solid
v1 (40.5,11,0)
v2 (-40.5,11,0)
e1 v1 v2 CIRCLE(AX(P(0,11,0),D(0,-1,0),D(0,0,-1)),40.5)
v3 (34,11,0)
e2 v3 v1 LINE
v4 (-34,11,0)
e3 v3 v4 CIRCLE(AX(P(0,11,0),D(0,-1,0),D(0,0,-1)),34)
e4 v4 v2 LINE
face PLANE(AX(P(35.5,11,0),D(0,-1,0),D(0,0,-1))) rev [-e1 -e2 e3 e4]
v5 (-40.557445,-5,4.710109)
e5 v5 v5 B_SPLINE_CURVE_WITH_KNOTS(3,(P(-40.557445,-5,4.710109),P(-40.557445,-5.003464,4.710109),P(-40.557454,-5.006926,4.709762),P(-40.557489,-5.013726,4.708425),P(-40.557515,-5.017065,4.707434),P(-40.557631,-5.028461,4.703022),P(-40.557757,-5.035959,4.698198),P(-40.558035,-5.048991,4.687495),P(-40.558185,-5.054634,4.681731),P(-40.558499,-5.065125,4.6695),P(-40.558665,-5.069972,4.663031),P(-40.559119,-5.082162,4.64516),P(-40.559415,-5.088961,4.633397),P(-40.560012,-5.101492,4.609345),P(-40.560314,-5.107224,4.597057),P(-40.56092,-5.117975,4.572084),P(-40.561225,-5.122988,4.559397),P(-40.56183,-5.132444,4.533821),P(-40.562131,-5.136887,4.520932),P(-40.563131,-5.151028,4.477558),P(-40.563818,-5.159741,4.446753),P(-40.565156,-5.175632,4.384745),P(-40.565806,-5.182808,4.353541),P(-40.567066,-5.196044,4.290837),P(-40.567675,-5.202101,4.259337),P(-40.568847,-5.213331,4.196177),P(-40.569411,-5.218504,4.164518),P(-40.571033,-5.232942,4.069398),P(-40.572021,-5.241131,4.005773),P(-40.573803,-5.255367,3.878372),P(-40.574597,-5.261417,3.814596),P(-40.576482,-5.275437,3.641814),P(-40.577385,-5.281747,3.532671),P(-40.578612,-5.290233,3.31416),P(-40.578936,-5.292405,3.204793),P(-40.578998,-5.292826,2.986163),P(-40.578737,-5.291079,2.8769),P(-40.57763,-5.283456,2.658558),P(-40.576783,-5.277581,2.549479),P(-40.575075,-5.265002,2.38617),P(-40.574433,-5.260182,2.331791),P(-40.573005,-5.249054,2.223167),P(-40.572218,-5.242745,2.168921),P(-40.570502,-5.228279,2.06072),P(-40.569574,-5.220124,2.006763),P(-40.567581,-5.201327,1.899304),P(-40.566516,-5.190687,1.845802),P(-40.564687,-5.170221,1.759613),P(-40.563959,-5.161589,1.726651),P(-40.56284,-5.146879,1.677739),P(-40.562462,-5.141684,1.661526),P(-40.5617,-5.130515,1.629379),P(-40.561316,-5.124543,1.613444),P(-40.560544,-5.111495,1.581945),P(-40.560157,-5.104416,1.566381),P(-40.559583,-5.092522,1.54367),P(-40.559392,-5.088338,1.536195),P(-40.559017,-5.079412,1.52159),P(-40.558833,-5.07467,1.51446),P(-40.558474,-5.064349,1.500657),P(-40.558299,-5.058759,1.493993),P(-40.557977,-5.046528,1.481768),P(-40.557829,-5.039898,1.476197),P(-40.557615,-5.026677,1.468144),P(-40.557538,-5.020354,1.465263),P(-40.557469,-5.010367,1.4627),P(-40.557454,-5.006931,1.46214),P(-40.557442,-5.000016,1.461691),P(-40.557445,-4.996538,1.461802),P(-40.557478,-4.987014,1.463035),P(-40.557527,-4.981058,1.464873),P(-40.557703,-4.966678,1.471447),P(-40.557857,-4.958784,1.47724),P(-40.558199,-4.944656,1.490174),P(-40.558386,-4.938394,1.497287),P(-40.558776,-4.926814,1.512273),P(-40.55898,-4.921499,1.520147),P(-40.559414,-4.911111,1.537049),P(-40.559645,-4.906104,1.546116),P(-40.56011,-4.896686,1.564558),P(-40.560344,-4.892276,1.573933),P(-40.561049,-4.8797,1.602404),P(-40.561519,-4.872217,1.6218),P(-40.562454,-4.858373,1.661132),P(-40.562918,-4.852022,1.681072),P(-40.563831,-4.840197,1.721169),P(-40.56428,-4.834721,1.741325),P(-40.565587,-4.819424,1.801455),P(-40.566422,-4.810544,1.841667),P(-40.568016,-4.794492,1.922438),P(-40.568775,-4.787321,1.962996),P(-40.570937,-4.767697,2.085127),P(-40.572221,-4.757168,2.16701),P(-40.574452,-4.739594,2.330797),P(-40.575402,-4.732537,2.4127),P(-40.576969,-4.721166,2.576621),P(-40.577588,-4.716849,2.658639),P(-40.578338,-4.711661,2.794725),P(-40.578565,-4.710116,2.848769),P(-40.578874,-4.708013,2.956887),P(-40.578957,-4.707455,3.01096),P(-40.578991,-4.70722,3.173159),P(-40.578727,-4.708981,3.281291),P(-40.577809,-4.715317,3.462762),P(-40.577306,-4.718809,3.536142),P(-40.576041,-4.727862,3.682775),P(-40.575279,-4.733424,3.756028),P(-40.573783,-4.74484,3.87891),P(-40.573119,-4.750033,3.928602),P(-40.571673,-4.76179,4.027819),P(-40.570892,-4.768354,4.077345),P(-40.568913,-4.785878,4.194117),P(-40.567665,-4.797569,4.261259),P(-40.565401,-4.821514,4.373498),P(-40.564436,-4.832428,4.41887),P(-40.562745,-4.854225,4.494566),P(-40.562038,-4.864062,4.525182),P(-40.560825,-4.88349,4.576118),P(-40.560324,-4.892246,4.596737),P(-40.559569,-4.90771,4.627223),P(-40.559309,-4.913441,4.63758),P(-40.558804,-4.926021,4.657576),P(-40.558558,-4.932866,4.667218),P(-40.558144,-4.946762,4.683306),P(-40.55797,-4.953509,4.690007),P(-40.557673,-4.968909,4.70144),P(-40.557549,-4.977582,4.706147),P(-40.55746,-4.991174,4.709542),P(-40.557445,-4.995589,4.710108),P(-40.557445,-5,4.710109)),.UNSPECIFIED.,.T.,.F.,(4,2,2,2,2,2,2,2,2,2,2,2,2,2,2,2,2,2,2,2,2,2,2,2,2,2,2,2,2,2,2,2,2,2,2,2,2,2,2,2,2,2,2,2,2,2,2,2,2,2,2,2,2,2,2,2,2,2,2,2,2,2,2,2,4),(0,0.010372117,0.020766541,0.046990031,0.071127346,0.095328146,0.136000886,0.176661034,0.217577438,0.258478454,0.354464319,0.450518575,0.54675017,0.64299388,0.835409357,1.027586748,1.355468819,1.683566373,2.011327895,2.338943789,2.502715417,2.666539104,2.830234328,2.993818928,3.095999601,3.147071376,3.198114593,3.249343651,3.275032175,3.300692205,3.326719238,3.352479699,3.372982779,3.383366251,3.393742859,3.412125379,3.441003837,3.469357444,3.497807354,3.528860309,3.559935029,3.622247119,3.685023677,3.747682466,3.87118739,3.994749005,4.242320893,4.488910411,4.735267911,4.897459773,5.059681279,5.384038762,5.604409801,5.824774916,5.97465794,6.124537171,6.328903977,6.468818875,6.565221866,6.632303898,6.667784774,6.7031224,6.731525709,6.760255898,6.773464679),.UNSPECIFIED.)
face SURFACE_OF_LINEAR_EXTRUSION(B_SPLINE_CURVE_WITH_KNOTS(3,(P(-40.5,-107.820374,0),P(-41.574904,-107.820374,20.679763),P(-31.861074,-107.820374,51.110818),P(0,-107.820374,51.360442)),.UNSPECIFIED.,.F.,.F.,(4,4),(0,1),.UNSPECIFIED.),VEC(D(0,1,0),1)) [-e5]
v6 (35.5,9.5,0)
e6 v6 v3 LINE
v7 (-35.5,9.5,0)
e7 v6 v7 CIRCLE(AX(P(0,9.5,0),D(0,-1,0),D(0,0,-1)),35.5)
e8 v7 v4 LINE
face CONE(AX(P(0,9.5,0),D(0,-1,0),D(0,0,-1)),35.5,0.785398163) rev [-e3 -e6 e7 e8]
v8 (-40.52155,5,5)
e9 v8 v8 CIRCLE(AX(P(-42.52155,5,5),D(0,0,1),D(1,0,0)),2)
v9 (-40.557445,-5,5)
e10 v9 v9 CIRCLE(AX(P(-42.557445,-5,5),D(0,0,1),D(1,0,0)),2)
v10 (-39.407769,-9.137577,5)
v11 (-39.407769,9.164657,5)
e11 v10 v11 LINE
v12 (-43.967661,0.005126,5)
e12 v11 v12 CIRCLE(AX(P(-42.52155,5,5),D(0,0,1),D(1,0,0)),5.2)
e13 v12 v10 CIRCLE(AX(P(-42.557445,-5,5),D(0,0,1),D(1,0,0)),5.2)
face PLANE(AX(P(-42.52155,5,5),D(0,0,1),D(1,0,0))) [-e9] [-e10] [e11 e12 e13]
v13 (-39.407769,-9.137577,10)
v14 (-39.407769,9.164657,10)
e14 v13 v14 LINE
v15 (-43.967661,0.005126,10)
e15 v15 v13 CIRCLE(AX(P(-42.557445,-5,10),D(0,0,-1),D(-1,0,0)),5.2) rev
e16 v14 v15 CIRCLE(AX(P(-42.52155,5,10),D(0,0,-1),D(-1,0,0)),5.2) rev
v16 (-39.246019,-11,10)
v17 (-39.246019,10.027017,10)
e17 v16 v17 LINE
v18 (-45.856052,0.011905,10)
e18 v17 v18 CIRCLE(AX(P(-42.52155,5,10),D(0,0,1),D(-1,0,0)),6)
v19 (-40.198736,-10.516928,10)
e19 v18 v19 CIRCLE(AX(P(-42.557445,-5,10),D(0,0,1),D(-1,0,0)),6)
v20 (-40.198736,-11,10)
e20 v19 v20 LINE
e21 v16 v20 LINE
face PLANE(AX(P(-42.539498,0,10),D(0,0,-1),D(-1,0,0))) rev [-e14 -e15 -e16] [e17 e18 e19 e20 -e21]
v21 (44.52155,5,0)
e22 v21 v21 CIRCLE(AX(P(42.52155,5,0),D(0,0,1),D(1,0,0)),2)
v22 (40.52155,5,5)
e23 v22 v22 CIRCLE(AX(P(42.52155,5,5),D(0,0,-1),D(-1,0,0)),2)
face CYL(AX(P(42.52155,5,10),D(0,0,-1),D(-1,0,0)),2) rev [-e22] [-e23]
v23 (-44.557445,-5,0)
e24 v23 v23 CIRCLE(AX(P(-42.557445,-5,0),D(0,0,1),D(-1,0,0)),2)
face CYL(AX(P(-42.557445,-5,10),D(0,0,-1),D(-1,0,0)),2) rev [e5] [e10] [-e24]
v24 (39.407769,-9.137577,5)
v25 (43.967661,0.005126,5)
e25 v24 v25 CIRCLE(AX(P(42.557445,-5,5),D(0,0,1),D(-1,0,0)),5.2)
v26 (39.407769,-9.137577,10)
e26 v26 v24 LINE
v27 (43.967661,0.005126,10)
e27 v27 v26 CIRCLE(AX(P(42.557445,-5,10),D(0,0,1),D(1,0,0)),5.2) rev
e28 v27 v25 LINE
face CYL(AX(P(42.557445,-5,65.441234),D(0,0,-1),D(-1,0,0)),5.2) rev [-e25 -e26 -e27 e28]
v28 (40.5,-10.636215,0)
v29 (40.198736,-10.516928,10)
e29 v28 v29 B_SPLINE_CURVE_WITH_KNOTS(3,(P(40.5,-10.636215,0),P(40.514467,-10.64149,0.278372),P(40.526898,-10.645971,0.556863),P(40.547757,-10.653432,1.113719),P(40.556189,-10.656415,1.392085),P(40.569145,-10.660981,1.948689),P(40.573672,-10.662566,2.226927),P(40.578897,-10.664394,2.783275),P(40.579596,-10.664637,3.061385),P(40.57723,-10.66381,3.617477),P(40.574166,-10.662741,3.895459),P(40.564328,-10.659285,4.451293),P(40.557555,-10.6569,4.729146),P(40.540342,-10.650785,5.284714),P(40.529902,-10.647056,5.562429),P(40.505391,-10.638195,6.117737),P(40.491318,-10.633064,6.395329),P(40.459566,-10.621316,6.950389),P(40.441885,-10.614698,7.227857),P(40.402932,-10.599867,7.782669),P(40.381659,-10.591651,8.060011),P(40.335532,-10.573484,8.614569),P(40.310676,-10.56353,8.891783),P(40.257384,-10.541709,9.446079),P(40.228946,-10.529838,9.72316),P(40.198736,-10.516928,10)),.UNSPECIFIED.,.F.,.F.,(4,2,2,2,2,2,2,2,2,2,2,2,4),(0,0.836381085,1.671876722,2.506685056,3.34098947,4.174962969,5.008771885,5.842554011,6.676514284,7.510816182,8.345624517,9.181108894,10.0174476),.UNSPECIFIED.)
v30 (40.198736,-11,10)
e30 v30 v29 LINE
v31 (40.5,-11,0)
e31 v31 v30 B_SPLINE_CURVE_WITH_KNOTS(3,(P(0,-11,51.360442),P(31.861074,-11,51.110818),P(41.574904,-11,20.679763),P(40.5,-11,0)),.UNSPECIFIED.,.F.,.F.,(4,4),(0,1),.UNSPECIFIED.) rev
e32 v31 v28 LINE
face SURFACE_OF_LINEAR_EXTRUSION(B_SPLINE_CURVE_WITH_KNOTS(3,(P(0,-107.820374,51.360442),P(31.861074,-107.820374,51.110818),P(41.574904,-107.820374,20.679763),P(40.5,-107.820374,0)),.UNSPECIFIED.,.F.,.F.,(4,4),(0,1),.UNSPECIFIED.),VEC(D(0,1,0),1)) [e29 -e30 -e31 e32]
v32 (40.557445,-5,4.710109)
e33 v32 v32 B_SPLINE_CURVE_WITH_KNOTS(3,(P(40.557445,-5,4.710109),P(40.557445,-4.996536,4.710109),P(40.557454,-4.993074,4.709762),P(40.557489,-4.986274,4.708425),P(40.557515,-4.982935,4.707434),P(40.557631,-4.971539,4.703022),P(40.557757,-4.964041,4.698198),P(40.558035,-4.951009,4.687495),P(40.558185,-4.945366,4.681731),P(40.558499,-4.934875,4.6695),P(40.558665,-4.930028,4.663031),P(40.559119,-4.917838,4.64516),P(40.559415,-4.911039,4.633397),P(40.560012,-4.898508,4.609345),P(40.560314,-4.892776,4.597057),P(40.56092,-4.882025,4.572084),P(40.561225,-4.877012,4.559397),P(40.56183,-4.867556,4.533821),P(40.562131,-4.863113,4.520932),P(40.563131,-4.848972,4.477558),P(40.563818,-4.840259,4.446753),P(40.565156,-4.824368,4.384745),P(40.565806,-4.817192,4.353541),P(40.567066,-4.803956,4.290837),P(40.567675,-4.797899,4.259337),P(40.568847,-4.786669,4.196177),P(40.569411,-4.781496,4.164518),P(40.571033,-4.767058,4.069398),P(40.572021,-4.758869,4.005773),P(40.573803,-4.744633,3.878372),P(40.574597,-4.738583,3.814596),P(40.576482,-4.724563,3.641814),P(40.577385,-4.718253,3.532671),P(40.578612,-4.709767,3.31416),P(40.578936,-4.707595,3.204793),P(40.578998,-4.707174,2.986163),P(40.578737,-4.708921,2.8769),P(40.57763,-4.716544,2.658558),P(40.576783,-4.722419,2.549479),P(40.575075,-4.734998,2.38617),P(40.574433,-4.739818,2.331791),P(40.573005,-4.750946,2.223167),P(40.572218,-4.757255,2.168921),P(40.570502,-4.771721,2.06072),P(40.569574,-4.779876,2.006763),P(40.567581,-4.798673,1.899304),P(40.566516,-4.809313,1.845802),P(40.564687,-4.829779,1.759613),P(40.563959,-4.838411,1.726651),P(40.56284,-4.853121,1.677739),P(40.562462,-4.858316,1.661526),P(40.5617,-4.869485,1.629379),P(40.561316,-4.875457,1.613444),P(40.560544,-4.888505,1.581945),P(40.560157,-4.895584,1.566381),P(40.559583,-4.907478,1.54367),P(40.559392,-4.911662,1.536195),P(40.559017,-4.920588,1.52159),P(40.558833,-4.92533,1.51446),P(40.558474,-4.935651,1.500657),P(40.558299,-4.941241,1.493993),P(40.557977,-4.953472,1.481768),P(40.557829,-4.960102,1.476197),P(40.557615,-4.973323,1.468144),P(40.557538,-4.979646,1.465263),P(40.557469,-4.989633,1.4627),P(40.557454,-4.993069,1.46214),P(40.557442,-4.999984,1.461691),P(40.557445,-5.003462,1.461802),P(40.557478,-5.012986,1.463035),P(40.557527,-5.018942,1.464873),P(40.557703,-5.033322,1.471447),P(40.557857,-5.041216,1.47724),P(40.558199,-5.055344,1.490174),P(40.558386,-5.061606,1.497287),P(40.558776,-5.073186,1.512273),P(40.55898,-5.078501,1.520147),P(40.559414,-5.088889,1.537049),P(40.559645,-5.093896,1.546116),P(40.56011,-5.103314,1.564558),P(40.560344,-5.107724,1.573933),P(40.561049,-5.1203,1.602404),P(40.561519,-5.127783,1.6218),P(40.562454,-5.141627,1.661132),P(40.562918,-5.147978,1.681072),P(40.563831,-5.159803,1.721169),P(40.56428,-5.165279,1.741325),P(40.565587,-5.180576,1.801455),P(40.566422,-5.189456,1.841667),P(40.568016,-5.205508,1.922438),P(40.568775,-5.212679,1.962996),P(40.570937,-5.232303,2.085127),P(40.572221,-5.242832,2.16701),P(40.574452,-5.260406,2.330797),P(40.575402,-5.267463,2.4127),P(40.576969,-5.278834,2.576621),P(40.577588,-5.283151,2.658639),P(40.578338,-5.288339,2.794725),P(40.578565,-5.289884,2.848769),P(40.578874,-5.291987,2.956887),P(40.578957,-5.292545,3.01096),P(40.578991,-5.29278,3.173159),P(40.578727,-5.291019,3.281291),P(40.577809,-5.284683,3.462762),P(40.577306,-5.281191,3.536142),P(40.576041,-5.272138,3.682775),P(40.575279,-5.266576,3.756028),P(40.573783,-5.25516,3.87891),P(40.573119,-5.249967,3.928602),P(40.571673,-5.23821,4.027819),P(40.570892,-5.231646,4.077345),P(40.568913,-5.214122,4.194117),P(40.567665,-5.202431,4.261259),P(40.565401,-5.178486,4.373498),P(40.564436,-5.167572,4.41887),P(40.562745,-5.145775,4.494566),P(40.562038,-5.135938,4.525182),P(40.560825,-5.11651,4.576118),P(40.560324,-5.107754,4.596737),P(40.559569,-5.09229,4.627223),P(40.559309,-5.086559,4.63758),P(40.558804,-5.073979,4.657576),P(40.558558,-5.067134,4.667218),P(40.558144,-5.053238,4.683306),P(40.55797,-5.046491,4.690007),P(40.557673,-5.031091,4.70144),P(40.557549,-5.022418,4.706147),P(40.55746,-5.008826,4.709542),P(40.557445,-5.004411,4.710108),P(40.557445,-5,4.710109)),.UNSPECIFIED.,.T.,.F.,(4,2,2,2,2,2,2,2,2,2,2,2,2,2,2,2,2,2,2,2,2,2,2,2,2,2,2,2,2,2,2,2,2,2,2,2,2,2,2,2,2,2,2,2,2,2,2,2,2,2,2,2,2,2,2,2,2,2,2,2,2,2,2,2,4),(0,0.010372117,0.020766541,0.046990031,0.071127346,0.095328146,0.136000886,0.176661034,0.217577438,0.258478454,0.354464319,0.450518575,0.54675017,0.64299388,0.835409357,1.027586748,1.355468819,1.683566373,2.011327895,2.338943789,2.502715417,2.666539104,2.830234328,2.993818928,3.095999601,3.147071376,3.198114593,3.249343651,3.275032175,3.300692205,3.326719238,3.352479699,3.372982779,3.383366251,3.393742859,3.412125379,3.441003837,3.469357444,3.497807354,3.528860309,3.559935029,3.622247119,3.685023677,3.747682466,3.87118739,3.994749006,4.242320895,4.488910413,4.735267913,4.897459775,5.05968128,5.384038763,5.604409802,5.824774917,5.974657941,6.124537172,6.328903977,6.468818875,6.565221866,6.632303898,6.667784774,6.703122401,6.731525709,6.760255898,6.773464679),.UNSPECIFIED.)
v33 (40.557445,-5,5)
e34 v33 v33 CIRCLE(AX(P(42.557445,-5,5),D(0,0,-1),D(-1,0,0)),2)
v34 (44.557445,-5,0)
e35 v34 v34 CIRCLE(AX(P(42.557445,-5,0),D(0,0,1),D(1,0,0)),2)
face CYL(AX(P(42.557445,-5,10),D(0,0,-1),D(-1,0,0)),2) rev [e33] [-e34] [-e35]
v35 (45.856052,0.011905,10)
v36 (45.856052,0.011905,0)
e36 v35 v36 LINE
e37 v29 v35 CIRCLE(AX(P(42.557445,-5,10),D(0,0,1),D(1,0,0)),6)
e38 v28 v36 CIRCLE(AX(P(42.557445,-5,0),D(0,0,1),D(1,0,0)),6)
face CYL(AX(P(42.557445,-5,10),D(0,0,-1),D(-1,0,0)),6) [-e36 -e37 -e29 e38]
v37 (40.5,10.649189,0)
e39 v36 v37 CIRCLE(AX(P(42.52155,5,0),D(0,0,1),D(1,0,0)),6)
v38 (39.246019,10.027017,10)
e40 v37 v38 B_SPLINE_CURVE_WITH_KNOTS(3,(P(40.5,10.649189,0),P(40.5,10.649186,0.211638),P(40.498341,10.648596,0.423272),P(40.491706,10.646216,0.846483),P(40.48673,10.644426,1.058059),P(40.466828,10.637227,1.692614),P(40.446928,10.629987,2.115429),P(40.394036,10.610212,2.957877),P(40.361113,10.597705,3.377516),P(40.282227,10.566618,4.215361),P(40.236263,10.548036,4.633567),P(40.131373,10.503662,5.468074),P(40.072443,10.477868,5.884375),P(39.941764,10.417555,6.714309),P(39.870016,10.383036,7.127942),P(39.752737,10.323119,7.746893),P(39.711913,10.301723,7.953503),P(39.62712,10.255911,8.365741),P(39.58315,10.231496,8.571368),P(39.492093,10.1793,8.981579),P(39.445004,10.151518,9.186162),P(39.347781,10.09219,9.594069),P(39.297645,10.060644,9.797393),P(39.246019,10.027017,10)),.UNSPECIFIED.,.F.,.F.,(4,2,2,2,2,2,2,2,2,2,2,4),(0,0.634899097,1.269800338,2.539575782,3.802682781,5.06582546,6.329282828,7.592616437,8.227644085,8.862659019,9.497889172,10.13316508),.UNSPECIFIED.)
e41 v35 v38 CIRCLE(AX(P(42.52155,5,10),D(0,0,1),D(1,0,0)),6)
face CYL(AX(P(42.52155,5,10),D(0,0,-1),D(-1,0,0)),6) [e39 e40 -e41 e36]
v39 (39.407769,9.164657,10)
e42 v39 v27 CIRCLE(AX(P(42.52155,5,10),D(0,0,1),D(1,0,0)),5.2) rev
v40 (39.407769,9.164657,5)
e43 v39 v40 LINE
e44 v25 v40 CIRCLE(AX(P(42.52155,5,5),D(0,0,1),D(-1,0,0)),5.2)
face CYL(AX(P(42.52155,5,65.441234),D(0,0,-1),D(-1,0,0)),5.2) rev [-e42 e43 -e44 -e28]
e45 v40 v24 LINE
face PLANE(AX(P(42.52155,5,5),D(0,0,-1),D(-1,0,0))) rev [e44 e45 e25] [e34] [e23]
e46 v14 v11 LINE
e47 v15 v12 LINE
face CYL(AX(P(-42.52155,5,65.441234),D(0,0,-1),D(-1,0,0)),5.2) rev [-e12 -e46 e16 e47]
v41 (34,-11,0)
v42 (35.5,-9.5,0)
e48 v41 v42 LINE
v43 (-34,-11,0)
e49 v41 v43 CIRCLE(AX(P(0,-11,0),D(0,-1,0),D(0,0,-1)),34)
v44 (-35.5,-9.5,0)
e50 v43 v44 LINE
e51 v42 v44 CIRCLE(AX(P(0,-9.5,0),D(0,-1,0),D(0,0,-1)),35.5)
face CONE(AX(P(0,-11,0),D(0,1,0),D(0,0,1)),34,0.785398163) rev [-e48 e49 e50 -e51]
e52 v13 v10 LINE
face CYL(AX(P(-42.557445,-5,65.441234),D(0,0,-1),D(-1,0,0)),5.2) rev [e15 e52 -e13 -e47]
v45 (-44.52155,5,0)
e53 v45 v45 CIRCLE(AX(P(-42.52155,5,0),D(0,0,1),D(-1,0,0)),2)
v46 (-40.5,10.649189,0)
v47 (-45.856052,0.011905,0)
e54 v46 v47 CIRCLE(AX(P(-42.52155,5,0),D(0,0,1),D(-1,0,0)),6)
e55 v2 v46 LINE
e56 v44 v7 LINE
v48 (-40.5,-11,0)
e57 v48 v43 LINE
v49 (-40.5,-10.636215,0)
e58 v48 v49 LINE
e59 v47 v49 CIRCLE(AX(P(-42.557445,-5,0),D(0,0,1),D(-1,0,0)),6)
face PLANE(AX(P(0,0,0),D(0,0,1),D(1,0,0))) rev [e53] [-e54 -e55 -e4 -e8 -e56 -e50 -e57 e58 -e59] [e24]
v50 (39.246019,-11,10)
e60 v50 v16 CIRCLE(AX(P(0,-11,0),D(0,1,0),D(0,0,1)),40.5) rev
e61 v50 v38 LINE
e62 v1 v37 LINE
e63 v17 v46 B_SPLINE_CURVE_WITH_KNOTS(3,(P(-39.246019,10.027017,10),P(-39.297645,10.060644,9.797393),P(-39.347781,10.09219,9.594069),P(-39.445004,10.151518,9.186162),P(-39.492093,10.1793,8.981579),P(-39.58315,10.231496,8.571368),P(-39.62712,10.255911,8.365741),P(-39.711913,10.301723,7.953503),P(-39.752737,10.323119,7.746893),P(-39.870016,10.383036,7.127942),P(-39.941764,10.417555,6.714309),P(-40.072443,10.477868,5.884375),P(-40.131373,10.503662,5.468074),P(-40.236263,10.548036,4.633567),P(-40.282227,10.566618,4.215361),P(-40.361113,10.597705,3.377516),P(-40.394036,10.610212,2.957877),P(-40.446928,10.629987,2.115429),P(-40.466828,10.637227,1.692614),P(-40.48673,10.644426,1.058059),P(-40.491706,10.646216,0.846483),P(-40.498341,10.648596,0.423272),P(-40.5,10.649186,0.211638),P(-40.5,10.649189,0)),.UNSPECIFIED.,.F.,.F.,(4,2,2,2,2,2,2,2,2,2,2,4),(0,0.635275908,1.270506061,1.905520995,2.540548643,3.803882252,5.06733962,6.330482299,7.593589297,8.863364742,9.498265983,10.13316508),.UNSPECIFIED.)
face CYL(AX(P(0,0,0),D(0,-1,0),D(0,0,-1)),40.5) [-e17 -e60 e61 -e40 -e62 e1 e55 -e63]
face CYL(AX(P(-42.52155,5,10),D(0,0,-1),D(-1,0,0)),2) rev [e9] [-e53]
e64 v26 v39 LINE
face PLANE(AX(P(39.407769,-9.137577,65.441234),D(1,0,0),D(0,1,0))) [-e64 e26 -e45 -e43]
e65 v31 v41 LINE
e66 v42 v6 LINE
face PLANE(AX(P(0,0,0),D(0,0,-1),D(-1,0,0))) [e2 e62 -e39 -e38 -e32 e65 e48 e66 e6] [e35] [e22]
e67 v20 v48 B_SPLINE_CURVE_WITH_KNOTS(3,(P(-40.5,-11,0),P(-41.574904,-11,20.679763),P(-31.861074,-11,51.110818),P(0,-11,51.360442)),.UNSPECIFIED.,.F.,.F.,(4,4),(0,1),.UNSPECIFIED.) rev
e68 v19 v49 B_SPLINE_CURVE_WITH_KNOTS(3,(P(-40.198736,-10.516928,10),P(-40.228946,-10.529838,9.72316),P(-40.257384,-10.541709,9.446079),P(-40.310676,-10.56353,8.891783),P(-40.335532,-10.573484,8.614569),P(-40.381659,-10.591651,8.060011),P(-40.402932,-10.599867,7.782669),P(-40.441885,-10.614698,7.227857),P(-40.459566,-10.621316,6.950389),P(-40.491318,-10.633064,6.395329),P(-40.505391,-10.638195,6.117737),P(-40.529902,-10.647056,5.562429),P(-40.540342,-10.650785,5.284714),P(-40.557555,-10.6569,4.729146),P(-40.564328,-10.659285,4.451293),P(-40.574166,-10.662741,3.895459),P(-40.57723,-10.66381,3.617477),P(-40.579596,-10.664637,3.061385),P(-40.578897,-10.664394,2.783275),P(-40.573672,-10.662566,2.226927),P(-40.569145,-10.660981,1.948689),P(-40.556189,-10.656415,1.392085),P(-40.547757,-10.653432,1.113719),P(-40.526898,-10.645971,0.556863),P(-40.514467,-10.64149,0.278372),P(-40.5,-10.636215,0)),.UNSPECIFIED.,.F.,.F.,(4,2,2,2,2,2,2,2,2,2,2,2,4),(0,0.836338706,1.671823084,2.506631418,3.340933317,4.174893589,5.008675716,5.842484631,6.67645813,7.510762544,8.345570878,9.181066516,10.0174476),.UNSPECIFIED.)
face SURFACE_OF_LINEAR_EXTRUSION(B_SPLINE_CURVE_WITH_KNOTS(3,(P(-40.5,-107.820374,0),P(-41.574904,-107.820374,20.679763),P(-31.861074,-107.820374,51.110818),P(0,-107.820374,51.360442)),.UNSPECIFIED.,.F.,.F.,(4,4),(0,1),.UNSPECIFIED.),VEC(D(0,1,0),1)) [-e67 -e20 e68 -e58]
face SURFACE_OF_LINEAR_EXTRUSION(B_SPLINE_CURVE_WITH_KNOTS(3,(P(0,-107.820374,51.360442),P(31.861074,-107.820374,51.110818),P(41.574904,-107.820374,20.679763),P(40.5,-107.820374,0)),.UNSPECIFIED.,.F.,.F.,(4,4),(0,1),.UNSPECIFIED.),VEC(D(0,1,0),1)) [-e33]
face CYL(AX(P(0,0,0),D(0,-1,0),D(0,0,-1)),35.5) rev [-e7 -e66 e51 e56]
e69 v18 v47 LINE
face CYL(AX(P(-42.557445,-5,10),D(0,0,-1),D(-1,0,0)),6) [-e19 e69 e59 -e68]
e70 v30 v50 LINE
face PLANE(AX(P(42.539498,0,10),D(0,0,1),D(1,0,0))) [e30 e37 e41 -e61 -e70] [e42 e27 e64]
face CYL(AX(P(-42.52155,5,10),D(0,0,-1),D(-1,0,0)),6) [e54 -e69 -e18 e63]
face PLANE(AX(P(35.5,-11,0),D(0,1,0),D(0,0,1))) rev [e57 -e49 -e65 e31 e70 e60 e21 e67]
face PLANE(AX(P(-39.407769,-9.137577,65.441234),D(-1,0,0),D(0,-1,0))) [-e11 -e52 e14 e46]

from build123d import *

# Parameters (mm, degrees)
REVOLVE1_ANGLE                  = 180
BOSS_EXTRUDE1_START             = -11
BOSS_EXTRUDE1_DEPTH             = 11
CUT_EXTRUDE1_REACH              = 68.374
BOSS_EXTRUDE2_REACH             = 67.327
BOSS_EXTRUDE2_END_RADIUS        = 40.5
SKETCH6_W                       = 25.4
SKETCH6_H                       = 18
BOSS_EXTRUDE2_DIRECTION_2_DEPTH = 15
SKETCH8_W                       = 4
SKETCH8_H                       = 19.884534
CUT_EXTRUDE3_DEPTH              = 80.722348
FILLET1_START                   = 2
FILLET1_DEPTH                   = 5
FILLET1_START_2                 = -11
FILLET1_2_DEPTH                 = 16.09884
FILLET1_START_3                 = 37
FILLET1_3_DEPTH                 = 28
FILLET1_START_4                 = 62
FILLET1_4_OUTLINE_W             = 4
FILLET1_4_OUTLINE_H             = 5
FILLET1_4_DEPTH                 = 3
FILLET1_START_5                 = 39.17071
FILLET1_5_OUTLINE_W             = 4
FILLET1_5_OUTLINE_H             = 5
FILLET1_5_DEPTH                 = 2.944756
FILLET1_6_DEPTH                 = 6
SKETCH9_R                       = 2
BOSS_EXTRUDE3_DEPTH             = 10
CUT_EXTRUDE4_DEPTH              = 75.187772
CUT_EXTRUDE4_DEPTH_BACK         = 5
CUT_EXTRUDE5_DEPTH              = 85.064413


with BuildPart() as part:
    # Sketch2 → Revolve1 (revolve, symmetric)
    with BuildSketch(Plane(origin=(0, 0, 0), x_dir=(0, 0, -1), z_dir=(1, 0, 0))) as revolve1_sk:
        Polygon((-34, -11), (-35.5, -9.5), (-35.5, 9.5), (-34, 11), (-35.5, 11), (-40.5, 11), (-40.5, -11), (-35.5, -11), align=None)
    revolve(axis=Axis((0, 0, 0), (0, 1, 0)), revolution_arc=REVOLVE1_ANGLE / 2)
    revolve(revolve1_sk.sketch, axis=Axis((0, 0, 0), (0, -1, 0)), revolution_arc=REVOLVE1_ANGLE / 2)

    # Sketch3 → Boss-Extrude1 (add)
    with BuildSketch(Plane(origin=(0, 0, 0), x_dir=(1, 0, 0), z_dir=(0, 1, 0)).offset(BOSS_EXTRUDE1_START)):
        with BuildLine():
            ThreePointArc((-40.5, 0), (0, -40.5), (40.5, 0))
            add(Edge.make_bspline(
                [(40.5, 0), (41.574904, -20.679763), (31.861074, -51.110818), (0, -51.360442)],
                knots=[0, 0, 0, 0, 1, 1, 1, 1], degree=3))
            add(Edge.make_bspline(
                [(-40.5, 0), (-41.574904, -20.679763), (-31.861074, -51.110818), (0, -51.360442)],
                knots=[0, 0, 0, 0, 1, 1, 1, 1], degree=3))
        make_face()
    extrude(amount=BOSS_EXTRUDE1_DEPTH)

    # Sketch5 → Cut-Extrude1 (cut, up to next)
    with BuildSketch(Plane(origin=(0, 0, 0), x_dir=(1, 0, 0), z_dir=(0, 1, 0)), mode=Mode.PRIVATE) as cut_extrude1_sk1:
        Polygon((32.298595, -50), (-32.298595, -50), (-4.520904, -70.798059), align=None)
    cut_extrude1_tool1 = extrude(cut_extrude1_sk1.sketch, amount=-CUT_EXTRUDE1_REACH, mode=Mode.PRIVATE) & part.part
    add(cut_extrude1_tool1.solids().sort_by_distance((-1.506968, 0, 56.932686))[0], mode=Mode.SUBTRACT)

    # Boss-Extrude2: up to this cylinder (the profile starts outside it)
    boss_extrude2_end = Plane(origin=(0, -2, 0), z_dir=(0, -1, 0)) * Cylinder(BOSS_EXTRUDE2_END_RADIUS, 216.654, mode=Mode.PRIVATE)
    # Sketch6 → Boss-Extrude2 (add, up to the surface)
    with BuildSketch(Plane.XY.offset(50), mode=Mode.PRIVATE) as boss_extrude2_sk1:
        with Locations((0, -2)):
            Rectangle(SKETCH6_W, SKETCH6_H)
    boss_extrude2_tool1 = extrude(boss_extrude2_sk1.sketch, amount=-BOSS_EXTRUDE2_REACH, mode=Mode.PRIVATE) - boss_extrude2_end
    add(boss_extrude2_tool1.solids().sort_by_distance((0, -2, 50))[0])

    # Sketch6 → Boss-Extrude2 direction 2 (add)
    with BuildSketch(Plane.XY.offset(50)):
        with Locations((0, -2)):
            Rectangle(SKETCH6_W, SKETCH6_H)
    extrude(amount=BOSS_EXTRUDE2_DIRECTION_2_DEPTH)

    # Sketch8 → Cut-Extrude3 (cut, through all)
    with BuildSketch(Plane(origin=(0, 11, 0), x_dir=(1, 0, 0), z_dir=(0, 1, 0))):
        with BuildLine():
            Line((15.113165, -40.129156), (15.113165, -45.006528))
            add(Edge.make_bspline(
                [(15.113165, -45.006528), (20.553217, -43.096096), (30.745136, -32.716473), (33.442003, -26.840069)],
                knots=[0, 0, 0, 0, 1, 1, 1, 1], degree=3))
            ThreePointArc((33.442003, -26.840069), (25.17044, -34.716075), (15.113165, -40.129156))
        make_face()
        with BuildLine():
            Line((-15.113165, -40.129156), (-15.113165, -45.006528))
            add(Edge.make_bspline(
                [(-15.113165, -45.006528), (-20.553217, -43.096096), (-30.745136, -32.716473), (-33.442003, -26.840069)],
                knots=[0, 0, 0, 0, 1, 1, 1, 1], degree=3))
            ThreePointArc((-33.442003, -26.840069), (-25.17044, -34.716075), (-15.113165, -40.129156))
        make_face()
        with Locations((0, -52.057733)):
            Rectangle(SKETCH8_W, SKETCH8_H)
    extrude(amount=-CUT_EXTRUDE3_DEPTH, mode=Mode.SUBTRACT)

    # Fillet1: read off the stored shape, not the designer's step
    # Fillet1 outline → Fillet1 (cut)
    with BuildSketch(Plane(origin=(0, 0, 0), x_dir=(1, 0, 0), z_dir=(0, 1, 0)).offset(FILLET1_START)):
        with BuildLine():
            Line((-12.7, -65), (12.7, -65))
            Line((12.7, -65), (12.7, -38.457249))
            ThreePointArc((12.7, -38.457249), (0, -40.5), (-12.7, -38.457249))
            Line((-12.7, -38.457249), (-12.7, -65))
        make_face()
    extrude(amount=FILLET1_DEPTH, mode=Mode.SUBTRACT)

    # Fillet1 2 outline → Fillet1 2 (cut)
    with BuildSketch(Plane(origin=(0, 0, 0), x_dir=(1, 0, 0), z_dir=(0, 1, 0)).offset(FILLET1_START_2)):
        with BuildLine():
            Line((-12.7, -65), (-7.7, -65))
            add(Edge.make_bspline(
                [(-7.7, -65), (-12.7, -65), (-12.7, -60)],
                knots=[0, 0, 0, 1, 1, 1], degree=2, weights=[1, 0.707107, 1]))
            Line((-12.7, -60), (-12.7, -65))
        make_face()
        with BuildLine():
            add(Edge.make_bspline(
                [(7.7, -65), (12.7, -65), (12.7, -60)],
                knots=[0, 0, 0, 1, 1, 1], degree=2, weights=[1, 0.707107, 1]))
            Line((7.7, -65), (12.7, -65))
            Line((12.7, -65), (12.7, -60))
        make_face()
    extrude(amount=FILLET1_2_DEPTH, mode=Mode.SUBTRACT)

    # Fillet1 3 outline → Fillet1 3 (add)
    with BuildSketch(Plane.XY.offset(FILLET1_START_3)):
        with BuildLine():
            add(Edge.make_bspline(
                [(-12.7, 2), (-12.7, 7), (-7.7, 7)],
                knots=[0, 0, 0, 1, 1, 1], degree=2, weights=[1, 0.707107, 1]))
            Line((-12.7, 2), (-2, 2))
            Line((-2, 2), (-2, 7))
            Line((-2, 7), (-7.7, 7))
        make_face()
        with BuildLine():
            Line((2, 7), (2, 2))
            Line((2, 2), (12.7, 2))
            add(Edge.make_bspline(
                [(7.7, 7), (12.7, 7), (12.7, 2)],
                knots=[0, 0, 0, 1, 1, 1], degree=2, weights=[1, 0.707107, 1]))
            Line((7.7, 7), (2, 7))
        make_face()
    extrude(amount=FILLET1_3_DEPTH)

    # Fillet1 4 outline → Fillet1 4 (add)
    with BuildSketch(Plane.XY.offset(FILLET1_START_4)):
        with Locations((0, 4.5)):
            Rectangle(FILLET1_4_OUTLINE_W, FILLET1_4_OUTLINE_H)
    extrude(amount=FILLET1_4_DEPTH)

    # Fillet1 5 outline → Fillet1 5 (add)
    with BuildSketch(Plane.XY.offset(FILLET1_START_5)):
        with Locations((0, 4.5)):
            Rectangle(FILLET1_5_OUTLINE_W, FILLET1_5_OUTLINE_H)
    extrude(amount=FILLET1_5_DEPTH)

    # Fillet1 6 outline → Fillet1 6 (cut)
    with BuildSketch(Plane(origin=(0, 0, 0), x_dir=(1, 0, 0), z_dir=(0, 1, 0)).offset(FILLET1_START)):
        with BuildLine():
            Line((-12.7, -65), (-7.7, -65))
            add(Edge.make_bspline(
                [(-12.7, -60), (-12.7, -60.274102), (-12.679965, -60.548369), (-12.639842, -60.820553), (-12.536378, -61.284433), (-12.482162, -61.478121), (-12.41762, -61.668662), (-12.288664, -61.991396), (-12.22893, -62.125441), (-12.163988, -62.25706), (-11.922281, -62.702191), (-11.720174, -63.002028), (-11.490067, -63.281001), (-10.981001, -63.790067), (-10.702028, -64.020174), (-10.402191, -64.222281), (-9.95706, -64.463988), (-9.825441, -64.52893), (-9.691396, -64.588664), (-9.368662, -64.71762), (-9.178121, -64.782162), (-8.984433, -64.836378), (-8.520553, -64.939842), (-8.248369, -64.979965), (-7.974102, -65), (-7.7, -65)],
                knots=[0, 0, 0, 0, 0, 0.139857, 0.139857, 0.139857, 0.242164, 0.242164, 0.242164, 0.316823, 0.316823, 0.316823, 0.5, 0.5, 0.5, 0.683177, 0.683177, 0.683177, 0.757836, 0.757836, 0.757836, 0.860143, 0.860143, 0.860143, 1, 1, 1, 1, 1], degree=4))
            Line((-12.7, -60), (-12.7, -65))
        make_face()
        with BuildLine():
            Line((12.7, -65), (12.7, -60))
            add(Edge.make_bspline(
                [(12.7, -60), (12.7, -60.274102), (12.679965, -60.548369), (12.639842, -60.820553), (12.536378, -61.284433), (12.482162, -61.478121), (12.41762, -61.668662), (12.288664, -61.991396), (12.22893, -62.125441), (12.163988, -62.25706), (11.922281, -62.702191), (11.720174, -63.002028), (11.490067, -63.281001), (10.981001, -63.790067), (10.702028, -64.020174), (10.402191, -64.222281), (9.95706, -64.463988), (9.825441, -64.52893), (9.691396, -64.588664), (9.368662, -64.71762), (9.178121, -64.782162), (8.984433, -64.836378), (8.520553, -64.939842), (8.248369, -64.979965), (7.974102, -65), (7.7, -65)],
                knots=[0, 0, 0, 0, 0, 0.139857, 0.139857, 0.139857, 0.242164, 0.242164, 0.242164, 0.316823, 0.316823, 0.316823, 0.5, 0.5, 0.5, 0.683177, 0.683177, 0.683177, 0.757836, 0.757836, 0.757836, 0.860143, 0.860143, 0.860143, 1, 1, 1, 1, 1], degree=4))
            Line((7.7, -65), (12.7, -65))
        make_face()
    extrude(amount=FILLET1_6_DEPTH, mode=Mode.SUBTRACT)

    # Sketch9 → Boss-Extrude3 (add)
    # profile 1 of 2: a face of its own
    with BuildSketch(Plane.XY):
        with BuildLine():
            ThreePointArc((39.222943, -0.011905), (42.578982, -10.999961), (45.856052, 0.011905))
            ThreePointArc((45.856052, 0.011905), (42.500013, 10.999961), (39.222943, -0.011905))
        make_face()
        with Locations((42.557445, -5)):
            Circle(SKETCH9_R, mode=Mode.SUBTRACT)
        with Locations((42.52155, 5)):
            Circle(SKETCH9_R, mode=Mode.SUBTRACT)
    # profile 2 of 2: a face of its own
    with BuildSketch(Plane.XY):
        with BuildLine():
            ThreePointArc((-39.222943, -0.011905), (-42.578982, -10.999961), (-45.856052, 0.011905))
            ThreePointArc((-45.856052, 0.011905), (-42.500013, 10.999961), (-39.222943, -0.011905))
        make_face()
        with Locations(Location((-42.557445, -5, 0), (0, 0, 180))):
            Circle(SKETCH9_R, mode=Mode.SUBTRACT)
        with Locations(Location((-42.52155, 5, 0), (0, 0, 180))):
            Circle(SKETCH9_R, mode=Mode.SUBTRACT)
    extrude(amount=BOSS_EXTRUDE3_DEPTH)

    # Sketch10 → Cut-Extrude4 (cut, two sides: drawn at the far end of the back side and taken through both)
    with BuildSketch(Plane.XY.offset(10).offset(-CUT_EXTRUDE4_DEPTH_BACK)):
        with BuildLine():
            Line((39.407769, -9.137577), (39.407769, 9.164657))
            ThreePointArc((39.407769, 9.164657), (47.176604, 7.317427), (43.967661, 0.005126))
            ThreePointArc((43.967661, 0.005126), (47.210797, -7.320844), (39.407769, -9.137577))
        make_face()
        with BuildLine():
            Line((-39.407769, -9.137577), (-39.407769, 9.164657))
            ThreePointArc((-39.407769, 9.164657), (-47.176604, 7.317427), (-43.967661, 0.005126))
            ThreePointArc((-43.967661, 0.005126), (-47.210797, -7.320844), (-39.407769, -9.137577))
        make_face()
    extrude(amount=CUT_EXTRUDE4_DEPTH + CUT_EXTRUDE4_DEPTH_BACK, mode=Mode.SUBTRACT)

    # Sketch11 → Cut-Extrude5 (cut, through all)
    with BuildSketch(Plane(origin=(0, 11, 0), x_dir=(1, 0, 0), z_dir=(0, 1, 0))):
        with BuildLine():
            Line((48.52155, -10), (39.246019, -10))
            ThreePointArc((39.246019, -10), (0, -40.5), (-39.246019, -10))
            Line((-39.246019, -10), (-48.52155, -10))
            Line((-48.52155, -10), (-48.52155, -69.748878))
            Line((-48.52155, -69.748878), (48.52155, -69.748878))
            Line((48.52155, -69.748878), (48.52155, -10))
        make_face()
    extrude(amount=-CUT_EXTRUDE5_DEPTH, mode=Mode.SUBTRACT)


solid = part.part
